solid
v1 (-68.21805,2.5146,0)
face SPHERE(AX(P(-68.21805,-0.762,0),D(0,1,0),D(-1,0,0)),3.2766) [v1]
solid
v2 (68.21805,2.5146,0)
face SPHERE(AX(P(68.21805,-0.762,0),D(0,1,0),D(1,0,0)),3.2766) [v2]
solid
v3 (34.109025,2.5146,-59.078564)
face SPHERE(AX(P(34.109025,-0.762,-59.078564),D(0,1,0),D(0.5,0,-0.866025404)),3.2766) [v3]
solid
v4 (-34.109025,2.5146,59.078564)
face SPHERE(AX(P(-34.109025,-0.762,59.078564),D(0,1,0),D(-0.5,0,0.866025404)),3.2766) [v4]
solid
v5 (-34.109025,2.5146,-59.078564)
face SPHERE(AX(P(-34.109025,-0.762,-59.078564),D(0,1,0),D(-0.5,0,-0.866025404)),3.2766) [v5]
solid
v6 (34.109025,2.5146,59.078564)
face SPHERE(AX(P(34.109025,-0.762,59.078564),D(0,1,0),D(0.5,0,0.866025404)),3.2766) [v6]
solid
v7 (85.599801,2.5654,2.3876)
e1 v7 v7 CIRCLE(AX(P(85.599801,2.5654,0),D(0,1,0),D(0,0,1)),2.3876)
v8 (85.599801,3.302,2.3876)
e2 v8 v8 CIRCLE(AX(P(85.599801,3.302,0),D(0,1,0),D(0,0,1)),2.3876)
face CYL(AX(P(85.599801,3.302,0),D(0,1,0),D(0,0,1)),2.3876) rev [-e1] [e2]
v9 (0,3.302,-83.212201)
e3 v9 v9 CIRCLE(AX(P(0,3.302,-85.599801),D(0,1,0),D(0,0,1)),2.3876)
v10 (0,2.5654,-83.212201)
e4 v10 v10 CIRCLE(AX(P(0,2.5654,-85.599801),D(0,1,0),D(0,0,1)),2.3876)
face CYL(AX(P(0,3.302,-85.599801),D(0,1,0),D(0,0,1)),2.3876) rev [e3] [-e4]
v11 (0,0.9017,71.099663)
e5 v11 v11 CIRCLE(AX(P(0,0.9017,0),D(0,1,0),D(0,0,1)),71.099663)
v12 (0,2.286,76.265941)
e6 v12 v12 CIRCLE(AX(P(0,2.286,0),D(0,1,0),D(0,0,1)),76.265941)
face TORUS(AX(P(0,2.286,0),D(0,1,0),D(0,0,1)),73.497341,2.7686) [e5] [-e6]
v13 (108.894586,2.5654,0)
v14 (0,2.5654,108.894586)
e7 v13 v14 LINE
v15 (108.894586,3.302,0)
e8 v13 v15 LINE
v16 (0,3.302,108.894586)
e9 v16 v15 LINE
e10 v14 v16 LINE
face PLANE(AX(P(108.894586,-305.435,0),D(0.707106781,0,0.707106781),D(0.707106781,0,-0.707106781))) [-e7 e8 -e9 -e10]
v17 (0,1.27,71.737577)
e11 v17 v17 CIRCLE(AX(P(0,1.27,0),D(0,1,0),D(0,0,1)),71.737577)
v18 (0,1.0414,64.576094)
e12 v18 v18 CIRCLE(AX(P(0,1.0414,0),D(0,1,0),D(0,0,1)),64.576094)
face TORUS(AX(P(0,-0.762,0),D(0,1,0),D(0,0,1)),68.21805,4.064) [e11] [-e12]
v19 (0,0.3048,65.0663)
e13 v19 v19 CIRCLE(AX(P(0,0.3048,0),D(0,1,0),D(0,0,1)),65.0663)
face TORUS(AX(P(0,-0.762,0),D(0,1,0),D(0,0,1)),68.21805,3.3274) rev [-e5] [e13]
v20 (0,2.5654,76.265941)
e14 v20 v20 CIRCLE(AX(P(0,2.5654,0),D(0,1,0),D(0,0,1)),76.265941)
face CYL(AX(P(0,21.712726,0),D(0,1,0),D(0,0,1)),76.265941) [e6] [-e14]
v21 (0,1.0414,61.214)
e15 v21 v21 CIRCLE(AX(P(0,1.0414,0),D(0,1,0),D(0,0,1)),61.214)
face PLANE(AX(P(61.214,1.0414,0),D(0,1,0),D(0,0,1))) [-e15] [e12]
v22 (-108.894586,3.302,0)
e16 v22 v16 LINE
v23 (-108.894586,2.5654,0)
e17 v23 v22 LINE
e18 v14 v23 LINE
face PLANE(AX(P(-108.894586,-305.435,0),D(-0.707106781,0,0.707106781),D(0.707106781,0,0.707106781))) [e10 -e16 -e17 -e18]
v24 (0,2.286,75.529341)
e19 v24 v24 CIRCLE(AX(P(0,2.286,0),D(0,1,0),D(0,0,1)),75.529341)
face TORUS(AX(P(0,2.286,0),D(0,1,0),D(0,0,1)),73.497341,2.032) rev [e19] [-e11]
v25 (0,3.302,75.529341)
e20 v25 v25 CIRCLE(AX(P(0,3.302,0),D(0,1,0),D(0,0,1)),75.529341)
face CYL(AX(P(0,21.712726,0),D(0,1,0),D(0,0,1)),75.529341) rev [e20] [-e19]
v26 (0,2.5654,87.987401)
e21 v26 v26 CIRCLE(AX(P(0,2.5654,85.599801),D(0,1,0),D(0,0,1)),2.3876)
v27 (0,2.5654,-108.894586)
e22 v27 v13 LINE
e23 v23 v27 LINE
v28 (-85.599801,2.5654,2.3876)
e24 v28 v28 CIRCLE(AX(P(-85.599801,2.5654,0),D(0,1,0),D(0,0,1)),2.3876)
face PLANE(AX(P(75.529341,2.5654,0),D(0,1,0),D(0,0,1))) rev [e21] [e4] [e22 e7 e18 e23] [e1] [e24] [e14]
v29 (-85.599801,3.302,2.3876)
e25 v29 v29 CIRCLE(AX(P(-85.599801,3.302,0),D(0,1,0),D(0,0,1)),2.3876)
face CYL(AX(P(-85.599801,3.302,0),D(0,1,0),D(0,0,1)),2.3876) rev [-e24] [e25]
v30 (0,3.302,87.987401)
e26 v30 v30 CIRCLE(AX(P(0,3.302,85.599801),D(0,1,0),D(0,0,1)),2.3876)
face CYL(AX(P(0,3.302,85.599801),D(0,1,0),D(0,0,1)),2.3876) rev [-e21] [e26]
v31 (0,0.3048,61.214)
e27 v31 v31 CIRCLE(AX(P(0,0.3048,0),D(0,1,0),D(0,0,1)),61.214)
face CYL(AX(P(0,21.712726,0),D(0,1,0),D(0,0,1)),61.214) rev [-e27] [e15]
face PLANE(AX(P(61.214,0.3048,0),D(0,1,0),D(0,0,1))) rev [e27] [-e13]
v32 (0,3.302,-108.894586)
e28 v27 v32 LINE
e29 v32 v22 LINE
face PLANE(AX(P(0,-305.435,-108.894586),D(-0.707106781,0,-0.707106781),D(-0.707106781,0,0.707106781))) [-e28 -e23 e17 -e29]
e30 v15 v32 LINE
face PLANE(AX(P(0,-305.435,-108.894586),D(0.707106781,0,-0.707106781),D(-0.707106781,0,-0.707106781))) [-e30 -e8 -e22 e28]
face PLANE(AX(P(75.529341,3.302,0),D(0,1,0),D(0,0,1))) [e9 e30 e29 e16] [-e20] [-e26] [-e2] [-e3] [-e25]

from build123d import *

# Parameters (mm, degrees)
SKETCH2_W                                 = 154.0002
SKETCH2_H                                 = 154.0002
SKETCH2_R                                 = 75.529340861
EXTRUDE1_DEPTH                            = 0.7366
EXTRUDE2_START                            = -0.7366
SKETCH3_R                                 = 75.529340861
EXTRUDE2_DEPTH                            = 0.7366
CIRPATTERN1_COUNT                         = 6
SKETCH5_W                                 = 3.3782
SKETCH5_H                                 = 0.7366
F_5_32_0_156250_DIAMETER_HOLE1_AT_2_COUNT = 2
F_5_32_0_156250_DIAMETER_HOLE1_AT_2_PITCH = 141.3002
F_5_32_0_156250_DIAMETER_HOLE1_AT_3_COUNT = 2
F_5_32_0_156250_DIAMETER_HOLE1_AT_3_PITCH = 141.3002
F_5_32_0_156250_DIAMETER_HOLE1_AT_4_COUNT = 2
F_5_32_0_156250_DIAMETER_HOLE1_AT_4_PITCH = 199.828659206
SKETCH7_W                                 = 2.3876
SKETCH7_H                                 = 8.128
F_5_32_0_156250_DIAMETER_HOLE2_AT_2_COUNT = 2
F_5_32_0_156250_DIAMETER_HOLE2_AT_2_PITCH = 121.0564
F_5_32_0_156250_DIAMETER_HOLE2_AT_3_COUNT = 2
F_5_32_0_156250_DIAMETER_HOLE2_AT_3_PITCH = 171.199602692
F_5_32_0_156250_DIAMETER_HOLE2_AT_4_COUNT = 2
F_5_32_0_156250_DIAMETER_HOLE2_AT_4_PITCH = 121.0564
CIRPATTERN2_COUNT                         = 4


with BuildPart() as part:
    # Sketch1 → Revolve-Thin4 (revolve)
    with BuildSketch(Plane.XY, mode=Mode.PRIVATE) as revolve_thin4_sk:
        with BuildLine():
            Line((62.74854946, 1.778), (61.214, 1.778))
            ThreePointArc((61.214, 1.778), (59.436, 0), (61.214, -1.778))
            Line((61.214, -1.778), (64.28309892, -1.778))
            ThreePointArc((64.28309892, -1.778), (67.669225582, -4.788771381), (71.737577241, -2.794))
            ThreePointArc((71.737577241, -2.794), (74.023261161, -1.847238721), (75.529340861, -3.81))
            Line((75.529340861, -3.81), (75.529340861, -4.826))
            Line((75.529340861, -4.826), (77.0001, -4.826))
            Line((77.0001, -4.826), (77.0001, -4.0894))
            Line((77.0001, -4.0894), (76.265940861, -4.0894))
            Line((76.265940861, -4.0894), (76.265940861, -3.81))
            ThreePointArc((76.265940861, -3.81), (74.21390727, -1.135737757), (71.099662929, -2.4257))
            ThreePointArc((71.099662929, -2.4257), (67.492675346, -4.00937161), (64.902401285, -1.0414))
            Line((64.902401285, -1.0414), (61.214, -1.0414))
            ThreePointArc((61.214, -1.0414), (60.1726, 0), (61.214, 1.0414))
            Line((61.214, 1.0414), (62.74854946, 1.0414))
            Line((62.74854946, 1.0414), (62.74854946, 1.778))
        make_face()
    revolve(revolve_thin4_sk.sketch.rotate(Axis((0, 21.71272626, 0), (0, -1, 0)), 90), axis=Axis((0, 21.71272626, 0), (0, -1, 0)))

    # Sketch2 → Extrude1 (add)
    with BuildSketch(Plane.XZ.offset(4.826)):
        Rectangle(SKETCH2_W, SKETCH2_H)
        with Locations(Location((0, 0, 0), (0, 0, 90))):
            Circle(SKETCH2_R, mode=Mode.SUBTRACT)
    extrude(amount=-EXTRUDE1_DEPTH)

    # Sketch5 → 5/32 (0.156250) Diameter Hole1 (revolve, cut)
    with BuildSketch(Plane(origin=(70.6501, -4.0894, -70.6501), x_dir=(0, 0, 1), z_dir=(1, 0, 0))):
        with Locations((1.6891, 0.3683)):
            Rectangle(SKETCH5_W, SKETCH5_H)
    f_5_32_0_156250_diameter_hole1 = revolve(axis=Axis((70.6501, 2.2606, -70.6501), (0, -1, 0)), mode=Mode.SUBTRACT)

    # 5/32 (0.156250) Diameter Hole1 at 2: 5/32 (0.156250) Diameter Hole1 ×2
    with Locations(*[(0, 0, i * F_5_32_0_156250_DIAMETER_HOLE1_AT_2_PITCH) for i in range(1, F_5_32_0_156250_DIAMETER_HOLE1_AT_2_COUNT)]):
        add(f_5_32_0_156250_diameter_hole1, mode=Mode.SUBTRACT)

    # 5/32 (0.156250) Diameter Hole1 at 3: 5/32 (0.156250) Diameter Hole1 ×2
    with Locations(*[(-i * F_5_32_0_156250_DIAMETER_HOLE1_AT_3_PITCH, 0, 0) for i in range(1, F_5_32_0_156250_DIAMETER_HOLE1_AT_3_COUNT)]):
        add(f_5_32_0_156250_diameter_hole1, mode=Mode.SUBTRACT)

    # 5/32 (0.156250) Diameter Hole1 at 4: 5/32 (0.156250) Diameter Hole1 ×2
    with Locations(*[Vector(-0.7071067811865476, 0, 0.7071067811865476) * (i * F_5_32_0_156250_DIAMETER_HOLE1_AT_4_PITCH) for i in range(1, F_5_32_0_156250_DIAMETER_HOLE1_AT_4_COUNT)]):
        add(f_5_32_0_156250_diameter_hole1, mode=Mode.SUBTRACT)

    # Sketch11 → 3/32 (0.093750) Diameter Hole2 (revolve, cut)
    with BuildSketch(Plane(origin=(-70.2437, -4.0894, -61.1251), x_dir=(0, 0, 1), z_dir=(1, 0, 0))):
        Polygon((0, 0), (0, 26.115399675), (1.190625, 25.4), (1.190625, 0), align=None)
    f_3_32_0_093750_diameter_hole2 = revolve(axis=Axis((-70.2437, 2.2606, -61.1251), (0, -1, 0)), mode=Mode.SUBTRACT)

    # CirPattern2: 3/32 (0.093750) Diameter Hole2 ×4 about axis
    cirpattern2_axis = Axis((0, 0, 0), (0, 1, 0))
    for i in range(1, CIRPATTERN2_COUNT):
        add(f_3_32_0_093750_diameter_hole2.rotate(cirpattern2_axis, i * 360 / CIRPATTERN2_COUNT), mode=Mode.SUBTRACT)


with BuildPart() as body_2:
    # Sketch1<5> → Revolve-Thin5 (revolve)
    with BuildSketch(Plane.XY, mode=Mode.PRIVATE) as revolve_thin5_sk:
        with BuildLine():
            Line((61.214, 1.0414), (64.576093872, 1.0414))
            ThreePointArc((64.576093872, 1.0414), (68.088390067, 3.299931105), (71.737577241, 1.27))
            ThreePointArc((71.737577241, 1.27), (74.023261161, 0.323238721), (75.529340861, 2.286))
            Line((75.529340861, 2.286), (75.529340861, 3.302))
            Line((75.529340861, 3.302), (77.0001, 3.302))
            Line((77.0001, 3.302), (77.0001, 2.5654))
            Line((77.0001, 2.5654), (76.265940861, 2.5654))
            Line((76.265940861, 2.5654), (76.265940861, 2.286))
            ThreePointArc((76.265940861, 2.286), (74.21390727, -0.388262243), (71.099662929, 0.9017))
            ThreePointArc((71.099662929, 0.9017), (67.890458911, 2.54923464), (65.066299927, 0.3048))
            Line((65.066299927, 0.3048), (61.214, 0.3048))
            Line((61.214, 0.3048), (61.214, 1.0414))
        make_face()
    revolve(revolve_thin5_sk.sketch.rotate(Axis((0, 21.71272626, 0), (0, -1, 0)), 90), axis=Axis((0, 21.71272626, 0), (0, -1, 0)))

    # Sketch3 → Extrude2 (add)
    with BuildSketch(Plane(origin=(0, 3.302, 0), x_dir=(-1, 0, 0), z_dir=(0, 1, 0)).offset(EXTRUDE2_START)):
        Polygon((0, -108.894585724), (108.894585724, 0), (0, 108.894585724), (-108.894585724, 0), align=None)
        with Locations(Location((0, 0, 0), (0, 0, 90))):
            Circle(SKETCH3_R, mode=Mode.SUBTRACT)
    extrude(amount=EXTRUDE2_DEPTH)

    # Sketch7 → 5/32 (0.156250) Diameter Hole2 (revolve, cut)
    with BuildSketch(Plane(origin=(85.599801346, 3.302, 0), x_dir=(0, 0, 1), z_dir=(1, 0, 0))):
        with Locations((1.1938, 4.064)):
            Rectangle(SKETCH7_W, SKETCH7_H)
    f_5_32_0_156250_diameter_hole2 = revolve(axis=Axis((85.599801346, 9.652, 0), (0, -1, 0)), mode=Mode.SUBTRACT)

    # 5/32 (0.156250) Diameter Hole2 at 2: 5/32 (0.156250) Diameter Hole2 ×2
    with Locations(*[Vector(-0.7071067811865476, 0, -0.7071067811865476) * (i * F_5_32_0_156250_DIAMETER_HOLE2_AT_2_PITCH) for i in range(1, F_5_32_0_156250_DIAMETER_HOLE2_AT_2_COUNT)]):
        add(f_5_32_0_156250_diameter_hole2, mode=Mode.SUBTRACT)

    # 5/32 (0.156250) Diameter Hole2 at 3: 5/32 (0.156250) Diameter Hole2 ×2
    with Locations(*[(-i * F_5_32_0_156250_DIAMETER_HOLE2_AT_3_PITCH, 0, 0) for i in range(1, F_5_32_0_156250_DIAMETER_HOLE2_AT_3_COUNT)]):
        add(f_5_32_0_156250_diameter_hole2, mode=Mode.SUBTRACT)

    # 5/32 (0.156250) Diameter Hole2 at 4: 5/32 (0.156250) Diameter Hole2 ×2
    with Locations(*[Vector(-0.7071067811865476, 0, 0.7071067811865476) * (i * F_5_32_0_156250_DIAMETER_HOLE2_AT_4_PITCH) for i in range(1, F_5_32_0_156250_DIAMETER_HOLE2_AT_4_COUNT)]):
        add(f_5_32_0_156250_diameter_hole2, mode=Mode.SUBTRACT)


with BuildPart() as body_3:
    # Sketch4 → Revolve1 (revolve)
    with BuildSketch(Plane.XY):
        with BuildLine():
            Line((68.21805, 2.5146), (68.21805, -4.0386))
            ThreePointArc((68.21805, -4.0386), (71.49465, -0.762), (68.21805, 2.5146))
        make_face()
    revolve(axis=Axis((68.21805, 2.837450101, 0), (0, -1, 0)))


with BuildPart() as cirpattern1_1:
    # CirPattern1: pattern copy
    add(body_3.part.rotate(Axis((0, 0, 0), (0, 1, 0)), 1 * 360 / CIRPATTERN1_COUNT))


with BuildPart() as cirpattern1_2:
    # CirPattern1: pattern copy
    add(body_3.part.rotate(Axis((0, 0, 0), (0, 1, 0)), 2 * 360 / CIRPATTERN1_COUNT))


with BuildPart() as cirpattern1_3:
    # CirPattern1: pattern copy
    add(body_3.part.rotate(Axis((0, 0, 0), (0, 1, 0)), 3 * 360 / CIRPATTERN1_COUNT))


with BuildPart() as cirpattern1_4:
    # CirPattern1: pattern copy
    add(body_3.part.rotate(Axis((0, 0, 0), (0, 1, 0)), 4 * 360 / CIRPATTERN1_COUNT))


with BuildPart() as cirpattern1_5:
    # CirPattern1: pattern copy
    add(body_3.part.rotate(Axis((0, 0, 0), (0, 1, 0)), 5 * 360 / CIRPATTERN1_COUNT))


solid = Compound([body_2.part, body_3.part, cirpattern1_1.part, cirpattern1_2.part, cirpattern1_3.part, cirpattern1_4.part, cirpattern1_5.part])
